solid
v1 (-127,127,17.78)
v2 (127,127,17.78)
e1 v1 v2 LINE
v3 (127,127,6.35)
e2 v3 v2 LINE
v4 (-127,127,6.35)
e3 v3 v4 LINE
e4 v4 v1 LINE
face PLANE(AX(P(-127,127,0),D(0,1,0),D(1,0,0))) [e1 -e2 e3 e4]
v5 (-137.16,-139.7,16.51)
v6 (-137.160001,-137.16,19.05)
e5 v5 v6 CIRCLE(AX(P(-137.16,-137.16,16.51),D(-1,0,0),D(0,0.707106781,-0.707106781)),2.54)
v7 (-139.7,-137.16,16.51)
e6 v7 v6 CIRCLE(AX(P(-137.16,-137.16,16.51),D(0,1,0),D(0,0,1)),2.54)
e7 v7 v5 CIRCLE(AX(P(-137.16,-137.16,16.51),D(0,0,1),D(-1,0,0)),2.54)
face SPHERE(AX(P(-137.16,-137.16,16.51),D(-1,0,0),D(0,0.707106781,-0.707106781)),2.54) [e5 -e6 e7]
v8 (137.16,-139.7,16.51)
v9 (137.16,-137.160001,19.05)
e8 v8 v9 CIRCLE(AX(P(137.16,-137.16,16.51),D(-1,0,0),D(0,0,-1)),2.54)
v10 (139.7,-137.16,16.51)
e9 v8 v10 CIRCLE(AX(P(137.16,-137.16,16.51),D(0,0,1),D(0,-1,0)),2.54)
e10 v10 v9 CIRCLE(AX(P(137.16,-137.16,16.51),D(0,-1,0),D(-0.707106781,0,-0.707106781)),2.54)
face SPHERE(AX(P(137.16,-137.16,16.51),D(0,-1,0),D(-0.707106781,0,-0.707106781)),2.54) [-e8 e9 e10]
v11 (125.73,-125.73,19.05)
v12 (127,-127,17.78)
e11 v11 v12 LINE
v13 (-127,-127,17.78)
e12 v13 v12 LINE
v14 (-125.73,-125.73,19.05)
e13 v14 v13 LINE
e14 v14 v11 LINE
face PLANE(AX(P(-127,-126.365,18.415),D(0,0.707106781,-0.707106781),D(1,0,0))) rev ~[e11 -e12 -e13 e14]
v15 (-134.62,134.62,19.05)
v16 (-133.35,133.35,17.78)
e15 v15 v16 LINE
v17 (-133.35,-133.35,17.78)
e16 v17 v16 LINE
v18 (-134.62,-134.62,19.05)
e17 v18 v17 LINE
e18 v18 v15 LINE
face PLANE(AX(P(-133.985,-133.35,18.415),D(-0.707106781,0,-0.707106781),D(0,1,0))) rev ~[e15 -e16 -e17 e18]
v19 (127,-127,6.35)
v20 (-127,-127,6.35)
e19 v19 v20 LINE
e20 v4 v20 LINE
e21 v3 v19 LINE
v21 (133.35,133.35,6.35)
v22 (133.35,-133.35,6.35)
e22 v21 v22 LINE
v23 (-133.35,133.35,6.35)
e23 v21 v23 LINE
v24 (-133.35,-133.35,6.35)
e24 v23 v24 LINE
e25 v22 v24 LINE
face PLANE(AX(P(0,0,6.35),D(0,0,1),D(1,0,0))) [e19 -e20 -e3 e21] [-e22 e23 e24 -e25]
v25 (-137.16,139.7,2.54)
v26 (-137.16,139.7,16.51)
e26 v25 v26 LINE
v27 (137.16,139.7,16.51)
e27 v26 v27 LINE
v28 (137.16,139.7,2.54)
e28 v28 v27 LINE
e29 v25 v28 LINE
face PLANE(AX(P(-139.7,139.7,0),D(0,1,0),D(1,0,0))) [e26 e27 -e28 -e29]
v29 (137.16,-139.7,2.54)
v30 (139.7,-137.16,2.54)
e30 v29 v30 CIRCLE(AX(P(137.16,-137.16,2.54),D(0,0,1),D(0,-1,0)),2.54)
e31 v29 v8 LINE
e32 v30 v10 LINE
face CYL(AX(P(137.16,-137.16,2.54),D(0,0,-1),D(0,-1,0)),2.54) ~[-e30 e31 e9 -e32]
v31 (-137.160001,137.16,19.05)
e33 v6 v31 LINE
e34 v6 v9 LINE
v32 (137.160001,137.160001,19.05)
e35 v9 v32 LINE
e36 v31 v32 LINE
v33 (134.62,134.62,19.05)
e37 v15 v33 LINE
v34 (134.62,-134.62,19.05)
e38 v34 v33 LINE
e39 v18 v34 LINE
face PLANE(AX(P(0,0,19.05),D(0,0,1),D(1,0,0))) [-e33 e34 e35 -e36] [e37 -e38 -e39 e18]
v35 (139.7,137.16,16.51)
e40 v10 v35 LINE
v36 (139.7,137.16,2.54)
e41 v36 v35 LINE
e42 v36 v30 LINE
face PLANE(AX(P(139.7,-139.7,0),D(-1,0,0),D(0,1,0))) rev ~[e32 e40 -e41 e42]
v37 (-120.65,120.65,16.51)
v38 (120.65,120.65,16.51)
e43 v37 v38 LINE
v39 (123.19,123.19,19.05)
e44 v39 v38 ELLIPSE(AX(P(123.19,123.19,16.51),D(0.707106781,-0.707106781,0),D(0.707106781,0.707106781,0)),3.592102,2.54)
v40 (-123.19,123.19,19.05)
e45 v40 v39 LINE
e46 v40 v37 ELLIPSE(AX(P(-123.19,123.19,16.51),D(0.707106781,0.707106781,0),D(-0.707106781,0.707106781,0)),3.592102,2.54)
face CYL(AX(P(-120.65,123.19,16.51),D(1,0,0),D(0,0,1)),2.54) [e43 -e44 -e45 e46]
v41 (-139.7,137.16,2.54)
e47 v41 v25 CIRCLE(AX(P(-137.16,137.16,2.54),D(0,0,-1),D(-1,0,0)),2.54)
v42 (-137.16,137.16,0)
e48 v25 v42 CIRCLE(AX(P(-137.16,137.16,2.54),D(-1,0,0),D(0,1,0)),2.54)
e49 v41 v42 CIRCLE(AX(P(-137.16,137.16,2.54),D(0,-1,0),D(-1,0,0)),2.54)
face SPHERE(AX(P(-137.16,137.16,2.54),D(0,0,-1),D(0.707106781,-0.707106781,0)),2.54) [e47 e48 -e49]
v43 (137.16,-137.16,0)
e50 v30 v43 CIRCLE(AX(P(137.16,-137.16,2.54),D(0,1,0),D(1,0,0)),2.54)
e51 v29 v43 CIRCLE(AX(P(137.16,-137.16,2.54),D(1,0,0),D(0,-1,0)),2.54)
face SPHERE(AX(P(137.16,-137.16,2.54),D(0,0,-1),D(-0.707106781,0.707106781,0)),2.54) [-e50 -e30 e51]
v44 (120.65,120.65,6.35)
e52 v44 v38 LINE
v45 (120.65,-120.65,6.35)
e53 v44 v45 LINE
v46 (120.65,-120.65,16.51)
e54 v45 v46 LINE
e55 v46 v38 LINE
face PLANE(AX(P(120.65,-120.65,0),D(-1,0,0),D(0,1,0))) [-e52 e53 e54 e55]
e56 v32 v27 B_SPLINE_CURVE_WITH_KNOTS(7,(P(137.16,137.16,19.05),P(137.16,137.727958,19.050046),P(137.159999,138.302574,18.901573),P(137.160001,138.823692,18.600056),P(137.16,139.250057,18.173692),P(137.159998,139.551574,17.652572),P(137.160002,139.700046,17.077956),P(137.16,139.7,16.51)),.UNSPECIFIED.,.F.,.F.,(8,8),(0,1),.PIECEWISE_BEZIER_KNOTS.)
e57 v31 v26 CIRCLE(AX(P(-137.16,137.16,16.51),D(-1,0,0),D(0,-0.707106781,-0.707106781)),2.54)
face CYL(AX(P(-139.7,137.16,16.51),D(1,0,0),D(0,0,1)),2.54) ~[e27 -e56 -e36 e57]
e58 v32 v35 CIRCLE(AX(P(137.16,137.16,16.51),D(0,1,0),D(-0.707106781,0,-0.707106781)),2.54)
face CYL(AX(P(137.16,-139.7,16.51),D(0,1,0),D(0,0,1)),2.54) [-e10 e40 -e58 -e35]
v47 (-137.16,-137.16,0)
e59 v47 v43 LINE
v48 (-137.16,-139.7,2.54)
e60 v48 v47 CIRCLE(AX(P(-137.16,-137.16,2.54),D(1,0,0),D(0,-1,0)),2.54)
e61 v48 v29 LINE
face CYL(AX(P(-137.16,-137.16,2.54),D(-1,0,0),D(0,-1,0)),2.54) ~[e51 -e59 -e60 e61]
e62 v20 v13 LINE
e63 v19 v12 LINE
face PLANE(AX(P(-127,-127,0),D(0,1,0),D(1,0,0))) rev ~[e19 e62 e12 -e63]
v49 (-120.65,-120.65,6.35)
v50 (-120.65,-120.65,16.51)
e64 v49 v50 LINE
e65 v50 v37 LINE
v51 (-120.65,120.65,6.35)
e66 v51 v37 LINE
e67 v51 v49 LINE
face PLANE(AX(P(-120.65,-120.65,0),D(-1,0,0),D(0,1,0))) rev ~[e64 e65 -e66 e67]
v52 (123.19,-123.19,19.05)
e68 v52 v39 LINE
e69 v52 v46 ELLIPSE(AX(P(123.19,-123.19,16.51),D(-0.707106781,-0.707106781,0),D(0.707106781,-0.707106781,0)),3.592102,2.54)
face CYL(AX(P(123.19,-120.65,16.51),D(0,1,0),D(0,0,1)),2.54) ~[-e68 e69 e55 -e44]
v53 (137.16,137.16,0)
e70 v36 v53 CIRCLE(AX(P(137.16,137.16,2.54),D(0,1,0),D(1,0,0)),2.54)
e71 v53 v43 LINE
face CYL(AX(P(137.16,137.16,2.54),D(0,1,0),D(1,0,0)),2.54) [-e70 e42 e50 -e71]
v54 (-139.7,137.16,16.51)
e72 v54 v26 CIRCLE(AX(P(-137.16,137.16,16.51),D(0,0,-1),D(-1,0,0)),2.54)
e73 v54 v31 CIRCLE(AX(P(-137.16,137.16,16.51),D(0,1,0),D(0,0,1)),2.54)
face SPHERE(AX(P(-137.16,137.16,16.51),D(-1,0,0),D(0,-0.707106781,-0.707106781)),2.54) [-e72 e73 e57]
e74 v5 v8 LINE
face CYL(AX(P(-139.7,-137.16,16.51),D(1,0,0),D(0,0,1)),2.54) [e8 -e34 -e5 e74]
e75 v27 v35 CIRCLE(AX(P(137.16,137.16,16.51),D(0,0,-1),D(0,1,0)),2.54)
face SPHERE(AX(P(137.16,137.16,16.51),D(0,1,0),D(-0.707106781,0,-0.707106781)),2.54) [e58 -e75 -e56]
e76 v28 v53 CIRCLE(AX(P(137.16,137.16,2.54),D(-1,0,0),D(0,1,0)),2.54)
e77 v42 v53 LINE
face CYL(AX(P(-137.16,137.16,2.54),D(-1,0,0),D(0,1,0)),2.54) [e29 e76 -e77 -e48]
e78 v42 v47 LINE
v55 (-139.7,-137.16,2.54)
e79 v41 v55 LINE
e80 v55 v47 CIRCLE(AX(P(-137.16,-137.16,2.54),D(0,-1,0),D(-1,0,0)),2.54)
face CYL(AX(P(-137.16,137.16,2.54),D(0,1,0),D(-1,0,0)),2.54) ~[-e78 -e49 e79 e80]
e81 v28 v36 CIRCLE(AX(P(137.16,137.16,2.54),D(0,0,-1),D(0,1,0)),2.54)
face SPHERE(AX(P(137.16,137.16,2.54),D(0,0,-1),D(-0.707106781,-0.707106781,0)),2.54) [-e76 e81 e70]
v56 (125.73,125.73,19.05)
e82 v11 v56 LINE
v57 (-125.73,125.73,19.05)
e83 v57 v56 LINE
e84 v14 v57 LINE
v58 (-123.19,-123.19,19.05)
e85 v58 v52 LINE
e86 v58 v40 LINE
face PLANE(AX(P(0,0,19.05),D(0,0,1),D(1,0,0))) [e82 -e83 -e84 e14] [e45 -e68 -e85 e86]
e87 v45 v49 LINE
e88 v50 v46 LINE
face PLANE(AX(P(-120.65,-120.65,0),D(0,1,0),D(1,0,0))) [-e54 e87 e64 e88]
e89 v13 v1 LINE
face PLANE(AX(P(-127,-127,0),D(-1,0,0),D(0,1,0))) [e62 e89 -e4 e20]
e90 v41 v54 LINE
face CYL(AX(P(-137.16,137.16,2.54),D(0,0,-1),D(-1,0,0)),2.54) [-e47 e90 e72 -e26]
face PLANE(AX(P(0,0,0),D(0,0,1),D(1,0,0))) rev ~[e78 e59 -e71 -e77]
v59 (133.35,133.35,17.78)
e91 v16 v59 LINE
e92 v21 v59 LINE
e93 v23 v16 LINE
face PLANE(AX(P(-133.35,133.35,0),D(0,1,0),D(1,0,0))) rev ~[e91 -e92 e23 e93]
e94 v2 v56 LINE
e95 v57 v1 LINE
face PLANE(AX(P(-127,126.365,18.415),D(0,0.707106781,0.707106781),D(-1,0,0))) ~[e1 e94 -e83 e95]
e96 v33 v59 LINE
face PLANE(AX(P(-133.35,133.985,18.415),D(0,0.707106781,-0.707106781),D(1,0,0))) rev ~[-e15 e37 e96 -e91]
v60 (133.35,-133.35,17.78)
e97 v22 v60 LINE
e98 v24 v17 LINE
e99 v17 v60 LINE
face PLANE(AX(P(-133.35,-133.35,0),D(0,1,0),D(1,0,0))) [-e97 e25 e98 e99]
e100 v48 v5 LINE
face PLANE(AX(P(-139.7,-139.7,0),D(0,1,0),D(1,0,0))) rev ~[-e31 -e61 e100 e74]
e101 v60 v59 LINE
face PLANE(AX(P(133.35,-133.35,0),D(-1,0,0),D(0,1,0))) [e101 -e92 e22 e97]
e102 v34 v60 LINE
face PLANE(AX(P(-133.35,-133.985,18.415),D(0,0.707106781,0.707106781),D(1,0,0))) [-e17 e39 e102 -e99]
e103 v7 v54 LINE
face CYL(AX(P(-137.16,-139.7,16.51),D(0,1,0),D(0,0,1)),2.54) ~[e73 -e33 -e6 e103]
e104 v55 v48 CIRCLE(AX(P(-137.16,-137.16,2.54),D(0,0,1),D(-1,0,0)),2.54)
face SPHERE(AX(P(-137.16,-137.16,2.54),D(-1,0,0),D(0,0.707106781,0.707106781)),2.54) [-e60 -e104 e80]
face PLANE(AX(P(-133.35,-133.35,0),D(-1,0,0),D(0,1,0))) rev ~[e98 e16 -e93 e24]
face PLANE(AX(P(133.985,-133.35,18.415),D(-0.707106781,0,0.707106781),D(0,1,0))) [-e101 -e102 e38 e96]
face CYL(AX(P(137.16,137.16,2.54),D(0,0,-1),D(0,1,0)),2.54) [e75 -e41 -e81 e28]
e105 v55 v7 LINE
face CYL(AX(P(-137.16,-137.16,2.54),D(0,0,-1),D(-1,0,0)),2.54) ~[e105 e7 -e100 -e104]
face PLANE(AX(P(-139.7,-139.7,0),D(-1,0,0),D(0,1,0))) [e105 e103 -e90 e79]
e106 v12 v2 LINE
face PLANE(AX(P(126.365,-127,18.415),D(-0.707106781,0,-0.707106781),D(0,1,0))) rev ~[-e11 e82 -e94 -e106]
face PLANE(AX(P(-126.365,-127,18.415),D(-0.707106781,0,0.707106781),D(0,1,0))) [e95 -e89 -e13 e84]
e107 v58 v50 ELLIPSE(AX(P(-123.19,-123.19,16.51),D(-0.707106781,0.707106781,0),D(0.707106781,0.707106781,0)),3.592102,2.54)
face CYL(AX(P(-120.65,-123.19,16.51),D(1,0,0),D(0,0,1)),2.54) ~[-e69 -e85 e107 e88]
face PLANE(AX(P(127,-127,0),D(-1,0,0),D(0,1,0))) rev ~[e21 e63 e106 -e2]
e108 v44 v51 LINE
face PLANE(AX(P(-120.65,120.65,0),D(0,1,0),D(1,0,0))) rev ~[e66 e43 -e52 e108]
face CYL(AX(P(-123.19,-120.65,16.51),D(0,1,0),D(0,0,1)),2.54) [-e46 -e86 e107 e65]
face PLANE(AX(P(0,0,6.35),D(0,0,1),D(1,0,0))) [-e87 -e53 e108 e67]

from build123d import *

# Parameters (mm, degrees)
F0_W         = 279.4
F0_H         = 279.4
F0_W_2       = 266.7
F0_H_2       = 266.7
F0_W_3       = 254
F0_H_3       = 254
F0_W_4       = 241.3
F0_H_4       = 241.3
F1_DEPTH     = 6.35
F2_DEPTH     = 19.05
F3_SIZE      = 1.27
F4_R         = 2.54
F5_T1_DEPTH  = 274.32
F5_T3_DEPTH  = 274.32
F5_T5_DEPTH  = 13.97
F5_S9_W      = 2.54
F5_S9_H      = 2.54
F5_T10_DEPTH = 2.54
F5_S15_W     = 2.54
F5_S15_H     = 2.54
F5_T16_DEPTH = 2.54
F5_S21_W     = 2.54
F5_S21_H     = 2.54
F5_T22_DEPTH = 2.54
F5_S27_W     = 2.54
F5_S27_H     = 2.54
F5_T28_DEPTH = 2.54
F5_S33_W     = 2.54
F5_S33_H     = 2.54
F5_T34_DEPTH = 2.54
F5_S39_W     = 2.54
F5_S39_H     = 2.54
F5_T40_DEPTH = 2.54
F5_S45_W     = 2.54
F5_S45_H     = 2.54
F5_T46_DEPTH = 2.54
F5_S51_W     = 2.54
F5_S51_H     = 2.54
F5_T52_DEPTH = 2.54


# Not quite as in the source:
# - a fillet or chamfer that OpenCascade refuses, or shapes differently, is made with other operations: its cross-section is extruded or revolved along the edge and cut away or added


with BuildPart() as f1:
    # F0 (on Top) → F1 (new body)
    with BuildSketch(Plane.XY):
        Rectangle(F0_W, F0_H)
        Rectangle(F0_W_2, F0_H_2, mode=Mode.SUBTRACT)
        Rectangle(F0_W_2, F0_H_2)
        Rectangle(F0_W_3, F0_H_3, mode=Mode.SUBTRACT)
        Rectangle(F0_W_3, F0_H_3)
        Rectangle(F0_W_4, F0_H_4, mode=Mode.SUBTRACT)
        Rectangle(F0_W_4, F0_H_4)
    extrude(amount=F1_DEPTH)

    # F0 (on Top) → F2 (join)
    with BuildSketch(Plane.XY):
        Rectangle(F0_W, F0_H)
        Rectangle(F0_W_2, F0_H_2, mode=Mode.SUBTRACT)
        Rectangle(F0_W_3, F0_H_3)
        Rectangle(F0_W_4, F0_H_4, mode=Mode.SUBTRACT)
    extrude(amount=F2_DEPTH)

    # F3
    f3_edges = [f1.edges().sort_by_distance(p)[0] for p in [
        (-127, 0, 19.05),
        (-133.35, 0, 19.05),
        (0, 133.35, 19.05),
        (0, 127, 19.05),
        (133.35, 0, 19.05),
        (127, 0, 19.05),
        (0, -127, 19.05),
        (0, -133.35, 19.05),
    ]]
    chamfer(f3_edges, length=F3_SIZE)

    # F4
    f4_edges = [f1.edges().sort_by_distance(p)[0] for p in [
        (-139.7, 0, 19.05),
        (0, 139.7, 19.05),
        (139.7, 0, 19.05),
        (0, -139.7, 19.05),
        (-120.65, 0, 19.05),
        (0, -120.65, 19.05),
        (120.65, 0, 19.05),
        (0, 120.65, 19.05),
    ]]
    fillet(f4_edges, radius=F4_R)

    # F5: fillet of radius 2.54 on 8 edges, made by hand

    # F5_s2 → F5_t1 (cut)
    with BuildSketch(Plane.YZ.offset(-137.16)):
        with BuildLine():
            ThreePointArc((139.7, 2.54), (138.9560512242, 0.7439487758), (137.16, 0))
            Line((137.16, 0), (139.7, 0))
            Line((139.7, 0), (139.7, 2.54))
        make_face()
        with BuildLine():
            ThreePointArc((-139.7, 2.54), (-138.9560512242, 0.7439487758), (-137.16, 0))
            Line((-137.16, 0), (-139.7, 0))
            Line((-139.7, 0), (-139.7, 2.54))
        make_face()
    extrude(amount=F5_T1_DEPTH, mode=Mode.SUBTRACT)

    # F5_s4 → F5_t3 (cut)
    with BuildSketch(Plane.XZ.offset(-137.16)):
        with BuildLine():
            ThreePointArc((-139.7, 2.54), (-138.9560512242, 0.7439487758), (-137.16, 0))
            Line((-137.16, 0), (-139.7, 0))
            Line((-139.7, 0), (-139.7, 2.54))
        make_face()
        with BuildLine():
            ThreePointArc((139.7, 2.54), (138.9560512242, 0.7439487758), (137.16, 0))
            Line((137.16, 0), (139.7, 0))
            Line((139.7, 0), (139.7, 2.54))
        make_face()
    extrude(amount=F5_T3_DEPTH, mode=Mode.SUBTRACT)

    # F5_s6 → F5_t5 (cut)
    with BuildSketch(Plane.XY.offset(2.54)):
        with BuildLine():
            ThreePointArc((137.16, 139.7), (138.9560512242, 138.9560512242), (139.7, 137.16))
            Line((139.7, 137.16), (139.7, 139.7))
            Line((139.7, 139.7), (137.16, 139.7))
        make_face()
        with BuildLine():
            ThreePointArc((-139.7, 137.16), (-138.9560512242, 138.9560512242), (-137.16, 139.7))
            Line((-137.16, 139.7), (-139.7, 139.7))
            Line((-139.7, 139.7), (-139.7, 137.16))
        make_face()
        with BuildLine():
            ThreePointArc((-139.7, -137.16), (-138.9560512242, -138.9560512242), (-137.16, -139.7))
            Line((-137.16, -139.7), (-139.7, -139.7))
            Line((-139.7, -139.7), (-139.7, -137.16))
        make_face()
        with BuildLine():
            ThreePointArc((137.16, -139.7), (138.9560512242, -138.9560512242), (139.7, -137.16))
            Line((139.7, -137.16), (139.7, -139.7))
            Line((139.7, -139.7), (137.16, -139.7))
        make_face()
    extrude(amount=F5_T5_DEPTH, mode=Mode.SUBTRACT)


with BuildPart() as f5_tool8:
    # F5_s9 → F5_t10 (new body)
    with BuildSketch(Plane.XZ.offset(137.16)):
        with Locations((138.43, 17.78)):
            Rectangle(F5_S9_W, F5_S9_H)
    extrude(amount=F5_T10_DEPTH)

    # F5_s11 → F5_t12 (revolve, cut)
    with BuildSketch(Plane(origin=(137.16, -137.16, 16.51), x_dir=(-0.7071067812, 0, -0.7071067812), z_dir=(-0.7071067812, 0, 0.7071067812))):
        with BuildLine():
            ThreePointArc((0, -2.54), (2.54, 0), (0, 2.54))
            Line((0, 2.54), (0, -2.54))
        make_face()
    revolve(axis=Axis((137.16, -137.16, 16.51), (0, -1, 0)), mode=Mode.SUBTRACT)


with BuildPart() as f1_1:
    add(f1.part)

    # F5_t7: cut F5_tool8
    add(f5_tool8.part, mode=Mode.SUBTRACT)


with BuildPart() as f5_tool14:
    # F5_s15 → F5_t16 (new body)
    with BuildSketch(Plane.YZ.offset(-137.16)):
        with Locations((-138.43, 17.78)):
            Rectangle(F5_S15_W, F5_S15_H)
    extrude(amount=-F5_T16_DEPTH)

    # F5_s17 → F5_t18 (revolve, cut)
    with BuildSketch(Plane(origin=(-137.16, -137.16, 16.51), x_dir=(0, 0.7071067812, -0.7071067812), z_dir=(0, 0.7071067812, 0.7071067812))):
        with BuildLine():
            ThreePointArc((0, -2.54), (2.54, 0), (0, 2.54))
            Line((0, 2.54), (0, -2.54))
        make_face()
    revolve(axis=Axis((-137.16, -137.16, 16.51), (-1, 0, 0)), mode=Mode.SUBTRACT)


with BuildPart() as f1_2:
    add(f1_1.part)

    # F5_t13: cut F5_tool14
    add(f5_tool14.part, mode=Mode.SUBTRACT)


with BuildPart() as f5_tool20:
    # F5_s21 → F5_t22 (new body)
    with BuildSketch(Plane.YZ.offset(-137.16)):
        with Locations((138.43, 17.78)):
            Rectangle(F5_S21_W, F5_S21_H)
    extrude(amount=-F5_T22_DEPTH)

    # F5_s23 → F5_t24 (revolve, cut)
    with BuildSketch(Plane(origin=(-137.16, 137.16, 16.51), x_dir=(0, -0.7071067812, -0.7071067812), z_dir=(0, 0.7071067812, -0.7071067812))):
        with BuildLine():
            ThreePointArc((0, -2.54), (2.54, 0), (0, 2.54))
            Line((0, 2.54), (0, -2.54))
        make_face()
    revolve(axis=Axis((-137.16, 137.16, 16.51), (-1, 0, 0)), mode=Mode.SUBTRACT)


with BuildPart() as f1_3:
    add(f1_2.part)

    # F5_t19: cut F5_tool20
    add(f5_tool20.part, mode=Mode.SUBTRACT)


with BuildPart() as f5_tool26:
    # F5_s27 → F5_t28 (new body)
    with BuildSketch(Plane.XZ.offset(-137.16)):
        with Locations((138.43, 17.78)):
            Rectangle(F5_S27_W, F5_S27_H)
    extrude(amount=-F5_T28_DEPTH)

    # F5_s29 → F5_t30 (revolve, cut)
    with BuildSketch(Plane(origin=(137.16, 137.16, 16.51), x_dir=(-0.7071067812, 0, -0.7071067812), z_dir=(0.7071067812, 0, -0.7071067812))):
        with BuildLine():
            ThreePointArc((0, -2.54), (2.54, 0), (0, 2.54))
            Line((0, 2.54), (0, -2.54))
        make_face()
    revolve(axis=Axis((137.16, 137.16, 16.51), (0, 1, 0)), mode=Mode.SUBTRACT)


with BuildPart() as f1_4:
    add(f1_3.part)

    # F5_t25: cut F5_tool26
    add(f5_tool26.part, mode=Mode.SUBTRACT)


with BuildPart() as f5_tool32:
    # F5_s33 → F5_t34 (new body)
    with BuildSketch(Plane.XY.offset(2.54)):
        with Locations((138.43, 138.43)):
            Rectangle(F5_S33_W, F5_S33_H)
    extrude(amount=-F5_T34_DEPTH)

    # F5_s35 → F5_t36 (revolve, cut)
    with BuildSketch(Plane(origin=(137.16, 137.16, 2.54), x_dir=(-0.7071067812, -0.7071067812, 0), z_dir=(0.7071067812, -0.7071067812, 0))):
        with BuildLine():
            ThreePointArc((0, -2.54), (2.54, 0), (0, 2.54))
            Line((0, 2.54), (0, -2.54))
        make_face()
    revolve(axis=Axis((137.16, 137.16, 2.54), (0, 0, -1)), mode=Mode.SUBTRACT)


with BuildPart() as f1_5:
    add(f1_4.part)

    # F5_t31: cut F5_tool32
    add(f5_tool32.part, mode=Mode.SUBTRACT)


with BuildPart() as f5_tool38:
    # F5_s39 → F5_t40 (new body)
    with BuildSketch(Plane.XY.offset(2.54)):
        with Locations((-138.43, 138.43)):
            Rectangle(F5_S39_W, F5_S39_H)
    extrude(amount=-F5_T40_DEPTH)

    # F5_s41 → F5_t42 (revolve, cut)
    with BuildSketch(Plane(origin=(-137.16, 137.16, 2.54), x_dir=(0.7071067812, -0.7071067812, 0), z_dir=(0.7071067812, 0.7071067812, 0))):
        with BuildLine():
            ThreePointArc((0, -2.54), (2.54, 0), (0, 2.54))
            Line((0, 2.54), (0, -2.54))
        make_face()
    revolve(axis=Axis((-137.16, 137.16, 2.54), (0, 0, -1)), mode=Mode.SUBTRACT)


with BuildPart() as f1_6:
    add(f1_5.part)

    # F5_t37: cut F5_tool38
    add(f5_tool38.part, mode=Mode.SUBTRACT)


with BuildPart() as f5_tool44:
    # F5_s45 → F5_t46 (new body)
    with BuildSketch(Plane.YZ.offset(-137.16)):
        with Locations((-138.43, 1.27)):
            Rectangle(F5_S45_W, F5_S45_H)
    extrude(amount=-F5_T46_DEPTH)

    # F5_s47 → F5_t48 (revolve, cut)
    with BuildSketch(Plane(origin=(-137.16, -137.16, 2.54), x_dir=(0, 0.7071067812, 0.7071067812), z_dir=(0, -0.7071067812, 0.7071067812))):
        with BuildLine():
            ThreePointArc((0, -2.54), (2.54, 0), (0, 2.54))
            Line((0, 2.54), (0, -2.54))
        make_face()
    revolve(axis=Axis((-137.16, -137.16, 2.54), (-1, 0, 0)), mode=Mode.SUBTRACT)


with BuildPart() as f1_7:
    add(f1_6.part)

    # F5_t43: cut F5_tool44
    add(f5_tool44.part, mode=Mode.SUBTRACT)


with BuildPart() as f5_tool50:
    # F5_s51 → F5_t52 (new body)
    with BuildSketch(Plane.XY.offset(2.54)):
        with Locations((138.43, -138.43)):
            Rectangle(F5_S51_W, F5_S51_H)
    extrude(amount=-F5_T52_DEPTH)

    # F5_s53 → F5_t54 (revolve, cut)
    with BuildSketch(Plane(origin=(137.16, -137.16, 2.54), x_dir=(-0.7071067812, 0.7071067812, 0), z_dir=(-0.7071067812, -0.7071067812, 0))):
        with BuildLine():
            ThreePointArc((0, -2.54), (2.54, 0), (0, 2.54))
            Line((0, 2.54), (0, -2.54))
        make_face()
    revolve(axis=Axis((137.16, -137.16, 2.54), (0, 0, -1)), mode=Mode.SUBTRACT)


with BuildPart() as f1_8:
    add(f1_7.part)

    # F5_t49: cut F5_tool50
    add(f5_tool50.part, mode=Mode.SUBTRACT)


solid = f1_8.part
